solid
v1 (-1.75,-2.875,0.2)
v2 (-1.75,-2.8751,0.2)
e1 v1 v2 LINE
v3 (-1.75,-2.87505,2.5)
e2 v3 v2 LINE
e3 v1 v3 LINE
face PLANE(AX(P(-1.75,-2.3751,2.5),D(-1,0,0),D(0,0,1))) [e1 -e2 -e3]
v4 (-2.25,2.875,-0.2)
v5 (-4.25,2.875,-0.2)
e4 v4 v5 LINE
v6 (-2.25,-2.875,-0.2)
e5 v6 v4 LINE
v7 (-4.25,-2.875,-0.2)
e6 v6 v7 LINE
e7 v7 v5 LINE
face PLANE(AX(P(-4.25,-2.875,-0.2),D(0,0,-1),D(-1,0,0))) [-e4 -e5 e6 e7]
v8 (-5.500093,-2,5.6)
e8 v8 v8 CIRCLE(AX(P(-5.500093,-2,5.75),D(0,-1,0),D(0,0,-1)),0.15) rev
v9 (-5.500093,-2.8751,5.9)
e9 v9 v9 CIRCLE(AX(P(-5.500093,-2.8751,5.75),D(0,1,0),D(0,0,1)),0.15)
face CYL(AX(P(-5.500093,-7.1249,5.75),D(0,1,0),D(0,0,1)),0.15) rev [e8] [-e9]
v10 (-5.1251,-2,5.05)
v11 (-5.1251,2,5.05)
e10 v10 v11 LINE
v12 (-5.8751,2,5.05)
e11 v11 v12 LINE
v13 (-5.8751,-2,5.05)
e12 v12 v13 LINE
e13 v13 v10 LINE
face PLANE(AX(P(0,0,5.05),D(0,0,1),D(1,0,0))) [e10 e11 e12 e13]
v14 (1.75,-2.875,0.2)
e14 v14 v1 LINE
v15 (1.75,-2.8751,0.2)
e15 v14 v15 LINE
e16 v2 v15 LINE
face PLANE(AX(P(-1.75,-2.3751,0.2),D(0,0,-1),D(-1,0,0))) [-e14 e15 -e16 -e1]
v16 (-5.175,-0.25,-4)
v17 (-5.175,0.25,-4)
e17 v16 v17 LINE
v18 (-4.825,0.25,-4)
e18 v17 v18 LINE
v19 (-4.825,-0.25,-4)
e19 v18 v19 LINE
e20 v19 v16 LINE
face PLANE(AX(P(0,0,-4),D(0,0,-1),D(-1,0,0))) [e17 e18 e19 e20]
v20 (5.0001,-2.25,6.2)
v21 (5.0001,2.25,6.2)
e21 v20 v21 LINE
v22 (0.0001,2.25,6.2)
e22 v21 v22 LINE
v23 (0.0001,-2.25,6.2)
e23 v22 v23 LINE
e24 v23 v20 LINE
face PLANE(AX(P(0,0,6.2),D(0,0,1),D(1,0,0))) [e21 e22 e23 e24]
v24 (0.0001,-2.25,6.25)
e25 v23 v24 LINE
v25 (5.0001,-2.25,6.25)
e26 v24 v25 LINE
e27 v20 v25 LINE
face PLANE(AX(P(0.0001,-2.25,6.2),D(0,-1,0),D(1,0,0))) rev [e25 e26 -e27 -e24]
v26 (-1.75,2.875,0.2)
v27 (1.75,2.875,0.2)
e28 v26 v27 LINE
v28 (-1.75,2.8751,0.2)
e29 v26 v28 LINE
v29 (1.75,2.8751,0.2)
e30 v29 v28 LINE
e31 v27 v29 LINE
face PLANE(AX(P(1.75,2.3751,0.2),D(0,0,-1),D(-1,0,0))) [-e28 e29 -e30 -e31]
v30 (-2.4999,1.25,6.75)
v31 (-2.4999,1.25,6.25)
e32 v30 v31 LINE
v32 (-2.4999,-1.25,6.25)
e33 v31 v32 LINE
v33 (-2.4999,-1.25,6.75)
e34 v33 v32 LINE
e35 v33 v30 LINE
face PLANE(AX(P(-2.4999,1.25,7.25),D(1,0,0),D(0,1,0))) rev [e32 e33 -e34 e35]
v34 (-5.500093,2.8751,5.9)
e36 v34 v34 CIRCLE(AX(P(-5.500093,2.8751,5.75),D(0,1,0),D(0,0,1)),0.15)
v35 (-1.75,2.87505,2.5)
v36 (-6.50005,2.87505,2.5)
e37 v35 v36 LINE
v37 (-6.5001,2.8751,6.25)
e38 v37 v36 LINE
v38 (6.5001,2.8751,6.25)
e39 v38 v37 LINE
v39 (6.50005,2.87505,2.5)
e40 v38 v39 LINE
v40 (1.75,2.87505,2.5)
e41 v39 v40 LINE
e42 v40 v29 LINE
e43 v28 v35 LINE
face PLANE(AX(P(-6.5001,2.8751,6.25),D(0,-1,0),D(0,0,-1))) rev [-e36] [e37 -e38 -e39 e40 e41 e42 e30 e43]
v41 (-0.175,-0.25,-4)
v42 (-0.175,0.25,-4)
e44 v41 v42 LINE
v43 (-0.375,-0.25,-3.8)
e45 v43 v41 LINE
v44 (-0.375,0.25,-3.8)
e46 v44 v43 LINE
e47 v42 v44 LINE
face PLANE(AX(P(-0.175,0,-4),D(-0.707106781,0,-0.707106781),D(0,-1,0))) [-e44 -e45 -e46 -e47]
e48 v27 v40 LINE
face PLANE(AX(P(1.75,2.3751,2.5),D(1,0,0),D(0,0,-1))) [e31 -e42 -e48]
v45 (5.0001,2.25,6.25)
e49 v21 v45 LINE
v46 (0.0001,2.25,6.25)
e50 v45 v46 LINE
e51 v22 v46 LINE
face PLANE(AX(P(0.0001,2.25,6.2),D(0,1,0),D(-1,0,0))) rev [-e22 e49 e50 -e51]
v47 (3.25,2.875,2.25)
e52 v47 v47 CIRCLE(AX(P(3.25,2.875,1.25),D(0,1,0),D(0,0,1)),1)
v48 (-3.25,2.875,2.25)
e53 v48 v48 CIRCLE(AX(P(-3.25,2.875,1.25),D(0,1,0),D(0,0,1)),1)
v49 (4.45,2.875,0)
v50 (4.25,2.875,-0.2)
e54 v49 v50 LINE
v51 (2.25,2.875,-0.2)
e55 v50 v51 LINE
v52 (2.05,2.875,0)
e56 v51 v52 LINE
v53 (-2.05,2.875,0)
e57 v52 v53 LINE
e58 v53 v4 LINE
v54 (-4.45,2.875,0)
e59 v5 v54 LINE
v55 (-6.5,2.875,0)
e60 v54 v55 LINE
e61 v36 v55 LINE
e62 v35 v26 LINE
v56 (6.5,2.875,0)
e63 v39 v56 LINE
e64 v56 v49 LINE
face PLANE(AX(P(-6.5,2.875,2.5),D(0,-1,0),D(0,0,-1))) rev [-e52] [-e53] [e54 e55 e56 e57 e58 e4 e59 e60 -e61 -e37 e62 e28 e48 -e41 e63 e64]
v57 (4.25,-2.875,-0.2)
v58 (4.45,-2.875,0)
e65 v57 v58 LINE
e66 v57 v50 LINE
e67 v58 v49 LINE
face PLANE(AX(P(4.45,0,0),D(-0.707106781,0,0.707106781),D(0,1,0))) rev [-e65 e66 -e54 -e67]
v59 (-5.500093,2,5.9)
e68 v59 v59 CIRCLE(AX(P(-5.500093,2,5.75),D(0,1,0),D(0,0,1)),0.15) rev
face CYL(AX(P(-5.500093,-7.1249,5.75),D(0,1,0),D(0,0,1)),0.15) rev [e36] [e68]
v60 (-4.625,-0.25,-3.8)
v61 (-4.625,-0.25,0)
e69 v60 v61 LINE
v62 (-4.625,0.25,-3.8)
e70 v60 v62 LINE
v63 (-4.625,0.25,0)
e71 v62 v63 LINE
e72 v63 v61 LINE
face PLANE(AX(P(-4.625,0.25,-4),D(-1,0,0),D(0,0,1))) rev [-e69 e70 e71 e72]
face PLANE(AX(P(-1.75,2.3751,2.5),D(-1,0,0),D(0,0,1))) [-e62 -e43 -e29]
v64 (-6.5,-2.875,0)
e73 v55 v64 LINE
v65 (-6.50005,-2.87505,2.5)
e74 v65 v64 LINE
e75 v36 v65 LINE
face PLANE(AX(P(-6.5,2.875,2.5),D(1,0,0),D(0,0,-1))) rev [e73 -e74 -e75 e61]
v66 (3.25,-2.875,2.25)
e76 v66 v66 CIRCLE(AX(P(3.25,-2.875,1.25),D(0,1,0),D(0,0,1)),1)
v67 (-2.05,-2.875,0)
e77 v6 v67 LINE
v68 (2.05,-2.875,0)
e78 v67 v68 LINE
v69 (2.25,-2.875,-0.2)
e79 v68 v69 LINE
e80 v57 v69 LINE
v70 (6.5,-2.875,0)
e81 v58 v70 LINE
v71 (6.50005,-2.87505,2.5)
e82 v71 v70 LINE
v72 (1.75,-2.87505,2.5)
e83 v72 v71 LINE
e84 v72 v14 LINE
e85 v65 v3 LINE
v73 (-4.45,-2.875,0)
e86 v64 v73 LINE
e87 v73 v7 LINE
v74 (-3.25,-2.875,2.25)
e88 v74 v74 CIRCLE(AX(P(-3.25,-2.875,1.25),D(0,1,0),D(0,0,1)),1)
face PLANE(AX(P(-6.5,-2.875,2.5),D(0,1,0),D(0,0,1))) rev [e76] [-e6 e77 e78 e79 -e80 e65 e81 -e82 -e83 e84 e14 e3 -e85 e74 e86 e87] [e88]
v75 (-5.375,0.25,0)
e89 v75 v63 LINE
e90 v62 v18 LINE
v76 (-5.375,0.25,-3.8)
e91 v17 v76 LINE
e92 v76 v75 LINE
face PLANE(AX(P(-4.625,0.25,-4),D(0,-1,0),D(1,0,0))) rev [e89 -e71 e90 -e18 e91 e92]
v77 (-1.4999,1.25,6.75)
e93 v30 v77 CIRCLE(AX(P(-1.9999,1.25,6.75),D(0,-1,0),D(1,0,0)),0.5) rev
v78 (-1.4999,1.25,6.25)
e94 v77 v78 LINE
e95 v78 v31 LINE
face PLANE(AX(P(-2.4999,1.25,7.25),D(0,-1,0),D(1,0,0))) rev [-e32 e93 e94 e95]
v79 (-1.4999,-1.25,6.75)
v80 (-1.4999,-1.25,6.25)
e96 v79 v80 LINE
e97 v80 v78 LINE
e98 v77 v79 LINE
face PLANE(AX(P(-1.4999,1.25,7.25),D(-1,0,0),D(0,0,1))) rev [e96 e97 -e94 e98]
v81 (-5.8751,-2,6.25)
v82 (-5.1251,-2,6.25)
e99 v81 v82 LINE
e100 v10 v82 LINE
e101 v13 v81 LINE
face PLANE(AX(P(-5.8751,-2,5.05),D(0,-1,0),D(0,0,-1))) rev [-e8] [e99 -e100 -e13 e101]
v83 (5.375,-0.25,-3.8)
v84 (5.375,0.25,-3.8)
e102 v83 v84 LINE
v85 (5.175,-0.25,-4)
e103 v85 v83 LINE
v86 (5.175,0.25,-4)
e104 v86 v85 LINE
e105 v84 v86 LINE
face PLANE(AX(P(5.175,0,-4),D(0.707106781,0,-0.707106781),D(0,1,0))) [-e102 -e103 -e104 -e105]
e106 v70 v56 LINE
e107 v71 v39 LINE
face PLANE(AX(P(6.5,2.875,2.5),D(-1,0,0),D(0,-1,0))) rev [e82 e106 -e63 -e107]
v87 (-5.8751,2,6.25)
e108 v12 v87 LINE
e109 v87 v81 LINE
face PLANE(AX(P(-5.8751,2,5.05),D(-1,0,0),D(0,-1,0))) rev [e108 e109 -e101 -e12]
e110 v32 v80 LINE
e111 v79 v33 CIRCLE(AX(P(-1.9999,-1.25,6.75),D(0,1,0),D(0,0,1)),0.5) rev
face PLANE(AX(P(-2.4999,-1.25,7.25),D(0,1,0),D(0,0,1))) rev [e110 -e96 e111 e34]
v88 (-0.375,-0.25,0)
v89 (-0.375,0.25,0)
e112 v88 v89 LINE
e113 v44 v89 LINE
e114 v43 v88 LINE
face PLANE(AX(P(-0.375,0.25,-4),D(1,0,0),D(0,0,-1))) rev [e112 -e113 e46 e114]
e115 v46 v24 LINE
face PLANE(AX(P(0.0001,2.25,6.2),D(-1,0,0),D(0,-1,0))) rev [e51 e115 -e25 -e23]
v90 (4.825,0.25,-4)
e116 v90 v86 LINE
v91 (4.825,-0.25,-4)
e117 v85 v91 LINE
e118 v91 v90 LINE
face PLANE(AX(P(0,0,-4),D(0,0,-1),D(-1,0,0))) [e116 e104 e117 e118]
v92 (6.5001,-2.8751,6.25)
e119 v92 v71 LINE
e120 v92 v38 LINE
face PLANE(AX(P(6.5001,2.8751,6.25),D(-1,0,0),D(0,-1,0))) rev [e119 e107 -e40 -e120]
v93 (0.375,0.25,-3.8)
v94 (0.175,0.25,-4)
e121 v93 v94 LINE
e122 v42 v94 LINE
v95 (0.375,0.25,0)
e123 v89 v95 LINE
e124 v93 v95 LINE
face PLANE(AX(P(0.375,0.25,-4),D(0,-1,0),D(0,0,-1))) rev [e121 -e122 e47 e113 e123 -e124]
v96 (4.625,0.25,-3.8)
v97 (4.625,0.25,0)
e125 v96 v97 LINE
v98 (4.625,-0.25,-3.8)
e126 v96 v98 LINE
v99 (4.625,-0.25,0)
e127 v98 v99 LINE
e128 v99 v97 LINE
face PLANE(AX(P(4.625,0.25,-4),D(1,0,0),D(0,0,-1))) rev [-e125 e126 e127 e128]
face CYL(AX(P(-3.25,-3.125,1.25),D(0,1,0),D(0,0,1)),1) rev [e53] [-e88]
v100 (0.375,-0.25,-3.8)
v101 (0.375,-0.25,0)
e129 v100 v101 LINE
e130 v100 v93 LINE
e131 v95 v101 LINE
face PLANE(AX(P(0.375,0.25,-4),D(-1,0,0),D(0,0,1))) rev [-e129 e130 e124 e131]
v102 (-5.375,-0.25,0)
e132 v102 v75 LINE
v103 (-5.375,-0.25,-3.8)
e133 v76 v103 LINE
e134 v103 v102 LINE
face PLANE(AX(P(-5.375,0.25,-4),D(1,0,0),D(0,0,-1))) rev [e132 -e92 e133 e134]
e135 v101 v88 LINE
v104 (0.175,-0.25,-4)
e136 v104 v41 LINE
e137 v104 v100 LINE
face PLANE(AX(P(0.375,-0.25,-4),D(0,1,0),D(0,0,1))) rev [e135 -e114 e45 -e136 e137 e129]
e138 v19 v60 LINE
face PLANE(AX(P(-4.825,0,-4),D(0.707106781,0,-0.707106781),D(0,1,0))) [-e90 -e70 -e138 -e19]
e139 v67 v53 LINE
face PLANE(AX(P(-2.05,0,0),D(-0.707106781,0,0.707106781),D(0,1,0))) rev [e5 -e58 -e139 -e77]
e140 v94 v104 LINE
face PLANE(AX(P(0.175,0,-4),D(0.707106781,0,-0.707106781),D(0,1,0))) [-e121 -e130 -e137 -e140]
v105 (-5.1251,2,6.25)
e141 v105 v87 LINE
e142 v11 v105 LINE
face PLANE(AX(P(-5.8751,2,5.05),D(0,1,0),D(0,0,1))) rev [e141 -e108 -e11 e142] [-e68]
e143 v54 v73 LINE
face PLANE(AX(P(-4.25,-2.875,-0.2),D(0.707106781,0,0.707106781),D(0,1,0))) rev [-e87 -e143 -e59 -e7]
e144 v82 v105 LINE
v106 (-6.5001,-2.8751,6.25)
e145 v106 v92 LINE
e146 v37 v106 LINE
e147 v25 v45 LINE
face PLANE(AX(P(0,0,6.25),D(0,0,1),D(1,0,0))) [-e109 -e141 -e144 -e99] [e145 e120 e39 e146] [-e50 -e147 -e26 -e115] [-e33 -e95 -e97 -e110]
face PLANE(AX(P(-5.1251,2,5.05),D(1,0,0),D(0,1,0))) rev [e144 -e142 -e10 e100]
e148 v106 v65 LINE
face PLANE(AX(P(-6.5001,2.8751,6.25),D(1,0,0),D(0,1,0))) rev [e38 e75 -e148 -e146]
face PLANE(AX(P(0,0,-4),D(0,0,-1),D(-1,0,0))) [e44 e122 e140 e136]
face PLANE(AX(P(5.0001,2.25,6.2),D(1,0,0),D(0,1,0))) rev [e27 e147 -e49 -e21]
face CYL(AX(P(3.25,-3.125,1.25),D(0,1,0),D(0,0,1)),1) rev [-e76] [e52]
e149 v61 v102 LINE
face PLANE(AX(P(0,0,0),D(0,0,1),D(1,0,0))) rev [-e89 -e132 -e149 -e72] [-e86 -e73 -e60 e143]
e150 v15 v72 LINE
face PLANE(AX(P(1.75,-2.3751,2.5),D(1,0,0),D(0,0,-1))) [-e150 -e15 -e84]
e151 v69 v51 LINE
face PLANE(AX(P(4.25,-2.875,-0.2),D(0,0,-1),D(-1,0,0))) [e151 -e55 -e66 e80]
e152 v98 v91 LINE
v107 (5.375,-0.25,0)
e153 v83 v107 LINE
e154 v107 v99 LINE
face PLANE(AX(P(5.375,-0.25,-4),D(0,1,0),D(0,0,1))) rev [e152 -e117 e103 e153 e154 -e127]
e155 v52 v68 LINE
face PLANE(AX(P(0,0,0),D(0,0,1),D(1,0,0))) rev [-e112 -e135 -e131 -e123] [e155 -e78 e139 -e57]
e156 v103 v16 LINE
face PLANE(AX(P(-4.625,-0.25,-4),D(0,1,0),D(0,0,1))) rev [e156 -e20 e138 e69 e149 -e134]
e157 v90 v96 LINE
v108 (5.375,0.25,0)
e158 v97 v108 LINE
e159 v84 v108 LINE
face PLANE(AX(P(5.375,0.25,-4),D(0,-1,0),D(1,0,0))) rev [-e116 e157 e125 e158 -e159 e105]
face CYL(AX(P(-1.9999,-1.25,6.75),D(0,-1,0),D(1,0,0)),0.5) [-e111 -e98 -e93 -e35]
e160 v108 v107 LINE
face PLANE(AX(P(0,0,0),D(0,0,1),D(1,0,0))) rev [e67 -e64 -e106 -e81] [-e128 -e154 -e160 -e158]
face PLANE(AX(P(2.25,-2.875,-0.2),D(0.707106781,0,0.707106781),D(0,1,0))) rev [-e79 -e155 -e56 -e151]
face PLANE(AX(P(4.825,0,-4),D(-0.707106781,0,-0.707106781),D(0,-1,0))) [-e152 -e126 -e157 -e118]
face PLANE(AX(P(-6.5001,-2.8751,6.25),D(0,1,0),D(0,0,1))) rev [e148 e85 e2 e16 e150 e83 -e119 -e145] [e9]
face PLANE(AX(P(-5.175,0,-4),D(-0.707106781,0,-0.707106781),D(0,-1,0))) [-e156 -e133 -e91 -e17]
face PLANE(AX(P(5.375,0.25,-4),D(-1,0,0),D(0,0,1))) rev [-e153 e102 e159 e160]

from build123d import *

# Parameters (mm, degrees)
SKETCH1_W            = 13
SKETCH1_H            = 5.75
BOSS_EXTRUDE1_DEPTH  = 2.5
SKETCH2_W            = 0.75
SKETCH2_H            = 0.5
BOSS_EXTRUDE2_DEPTH  = 4
CHAMFER1_SIZE        = 0.2
SKETCH4_R            = 1
CUT_EXTRUDE1_DEPTH   = 6
SKETCH5_W            = 2
SKETCH5_H            = 0.2
BOSS_EXTRUDE3_DEPTH  = 5.75
CHAMFER2_SIZE        = 0.2
SKETCH10_W           = 13.0002
SKETCH10_H           = 5.7502
BOSS_EXTRUDE8_DEPTH  = 3.75
SKETCH11_W           = 3.5
SKETCH11_H           = 2.3
BOSS_EXTRUDE9_DEPTH  = 0.5
SKETCH12_W           = 3.5
SKETCH12_H           = 2.3
BOSS_EXTRUDE10_DEPTH = 0.5
SKETCH13_W           = 1
SKETCH13_H           = 2.5
BOSS_EXTRUDE11_DEPTH = 1
FILLET2_RADIUS       = 0.5
FILLET2_LENGTH       = 2.5
SKETCH14_W           = 5
SKETCH14_H           = 4.5
CUT_EXTRUDE2_DEPTH   = 0.05
SKETCH15_R           = 0.15
CUT_EXTRUDE3_DEPTH   = 10
SKETCH16_W           = 0.75
SKETCH16_H           = 4
CUT_EXTRUDE4_DEPTH   = 1.2


with BuildPart() as part:
    # Sketch1 → Boss-Extrude1 (new body)
    with BuildSketch(Plane.XY):
        Rectangle(SKETCH1_W, SKETCH1_H)
    extrude(amount=BOSS_EXTRUDE1_DEPTH)

    # Sketch2 → Boss-Extrude2 (add)
    with BuildSketch(Plane(origin=(0, 0, 0), x_dir=(-1, 0, 0), z_dir=(0, 0, -1))):
        Rectangle(SKETCH2_W, SKETCH2_H)
        with Locations((-5, 0)):
            Rectangle(SKETCH2_W, SKETCH2_H)
        with Locations((5, 0)):
            Rectangle(SKETCH2_W, SKETCH2_H)
    extrude(amount=BOSS_EXTRUDE2_DEPTH)

    # Chamfer1
    chamfer1_edges = [part.edges().sort_by_distance(p)[0] for p in [
        (-0.375, 0, -4),
        (0.375, 0, -4),
        (4.625, 0, -4),
        (5.375, 0, -4),
        (-5.375, 0, -4),
        (-4.625, 0, -4),
    ]]
    chamfer(chamfer1_edges, length=CHAMFER1_SIZE)

    # Sketch4 → Cut-Extrude1 (cut)
    with BuildSketch(Plane(origin=(0, 2.875, 0), x_dir=(1, 0, 0), z_dir=(0, 1, 0))):
        with Locations(Location((-3.25, -1.25, 0), (0, 0, 270))):
            Circle(SKETCH4_R)
        with Locations(Location((3.25, -1.25, 0), (0, 0, 270))):
            Circle(SKETCH4_R)
    extrude(amount=-CUT_EXTRUDE1_DEPTH, mode=Mode.SUBTRACT)

    # Sketch5 → Boss-Extrude3 (add)
    with BuildSketch(Plane(origin=(0, 2.875, 0), x_dir=(1, 0, 0), z_dir=(0, 1, 0))):
        with Locations((-3.25, 0.1)):
            Rectangle(SKETCH5_W, SKETCH5_H)
        with Locations((3.25, 0.1)):
            Rectangle(SKETCH5_W, SKETCH5_H)
    extrude(amount=-BOSS_EXTRUDE3_DEPTH)

    # Chamfer2
    chamfer2_edges = [part.edges().sort_by_distance(p)[0] for p in [
        (4.25, 0, 0),
        (2.25, 0, 0),
        (-2.25, 0, 0),
        (-4.25, 0, 0),
    ]]
    chamfer(chamfer2_edges, length=CHAMFER2_SIZE - 0.0001)  # a hair under: the kernel refuses the full size

    # Sketch10 → Boss-Extrude8 (add)
    with BuildSketch(Plane.XY.offset(2.5)):
        Rectangle(SKETCH10_W, SKETCH10_H)
    extrude(amount=BOSS_EXTRUDE8_DEPTH)

    # Sketch11 → Boss-Extrude9 (add)
    with BuildSketch(Plane.XZ.offset(2.8751)):
        with Locations((0, 1.35)):
            Rectangle(SKETCH11_W, SKETCH11_H)
    extrude(amount=-BOSS_EXTRUDE9_DEPTH)

    # Sketch12 → Boss-Extrude10 (add)
    with BuildSketch(Plane(origin=(0, 2.8751, 0), x_dir=(1, 0, 0), z_dir=(0, 1, 0))):
        with Locations((0, -1.35)):
            Rectangle(SKETCH12_W, SKETCH12_H)
    extrude(amount=-BOSS_EXTRUDE10_DEPTH)

    # Sketch13 → Boss-Extrude11 (add)
    with BuildSketch(Plane.XY.offset(6.25)):
        with Locations((-1.9999, 0)):
            Rectangle(SKETCH13_W, SKETCH13_H)
    extrude(amount=BOSS_EXTRUDE11_DEPTH)

    # Fillet2: full round fillet: the end face becomes a half cylinder, R = half its width
    fillet2_face = Plane((-1.9999, 0, 7.25), x_dir=(0, -1, 0), z_dir=(0, 0, 1))  # on the end face: x along it, z out of the body
    fillet2_slab = fillet2_face.offset(-FILLET2_RADIUS / 2) * Box(FILLET2_LENGTH, 2 * FILLET2_RADIUS, FILLET2_RADIUS, mode=Mode.PRIVATE)  # the body's end, R deep
    fillet2_round = Plane((-1.9999, 0, 6.75), x_dir=(0, 0, 1), z_dir=(0, -1, 0)) * Cylinder(FILLET2_RADIUS, FILLET2_LENGTH, mode=Mode.PRIVATE)  # its axis R under the face
    add(fillet2_slab - fillet2_round, mode=Mode.SUBTRACT)

    # Sketch14 → Cut-Extrude2 (cut)
    with BuildSketch(Plane.XY.offset(6.25)):
        with Locations((2.5001, 0)):
            Rectangle(SKETCH14_W, SKETCH14_H)
    extrude(amount=-CUT_EXTRUDE2_DEPTH, mode=Mode.SUBTRACT)

    # Sketch15 → Cut-Extrude3 (cut)
    with BuildSketch(Plane(origin=(0, 2.8751, 0), x_dir=(1, 0, 0), z_dir=(0, 1, 0))):
        with Locations(Location((-5.500093333, -5.75, 0), (0, 0, 270))):
            Circle(SKETCH15_R)
    extrude(amount=-CUT_EXTRUDE3_DEPTH, mode=Mode.SUBTRACT)

    # Sketch16 → Cut-Extrude4 (cut)
    with BuildSketch(Plane.XY.offset(6.25)):
        with Locations((-5.5001, 0)):
            Rectangle(SKETCH16_W, SKETCH16_H)
    extrude(amount=-CUT_EXTRUDE4_DEPTH, mode=Mode.SUBTRACT)


solid = part.part
